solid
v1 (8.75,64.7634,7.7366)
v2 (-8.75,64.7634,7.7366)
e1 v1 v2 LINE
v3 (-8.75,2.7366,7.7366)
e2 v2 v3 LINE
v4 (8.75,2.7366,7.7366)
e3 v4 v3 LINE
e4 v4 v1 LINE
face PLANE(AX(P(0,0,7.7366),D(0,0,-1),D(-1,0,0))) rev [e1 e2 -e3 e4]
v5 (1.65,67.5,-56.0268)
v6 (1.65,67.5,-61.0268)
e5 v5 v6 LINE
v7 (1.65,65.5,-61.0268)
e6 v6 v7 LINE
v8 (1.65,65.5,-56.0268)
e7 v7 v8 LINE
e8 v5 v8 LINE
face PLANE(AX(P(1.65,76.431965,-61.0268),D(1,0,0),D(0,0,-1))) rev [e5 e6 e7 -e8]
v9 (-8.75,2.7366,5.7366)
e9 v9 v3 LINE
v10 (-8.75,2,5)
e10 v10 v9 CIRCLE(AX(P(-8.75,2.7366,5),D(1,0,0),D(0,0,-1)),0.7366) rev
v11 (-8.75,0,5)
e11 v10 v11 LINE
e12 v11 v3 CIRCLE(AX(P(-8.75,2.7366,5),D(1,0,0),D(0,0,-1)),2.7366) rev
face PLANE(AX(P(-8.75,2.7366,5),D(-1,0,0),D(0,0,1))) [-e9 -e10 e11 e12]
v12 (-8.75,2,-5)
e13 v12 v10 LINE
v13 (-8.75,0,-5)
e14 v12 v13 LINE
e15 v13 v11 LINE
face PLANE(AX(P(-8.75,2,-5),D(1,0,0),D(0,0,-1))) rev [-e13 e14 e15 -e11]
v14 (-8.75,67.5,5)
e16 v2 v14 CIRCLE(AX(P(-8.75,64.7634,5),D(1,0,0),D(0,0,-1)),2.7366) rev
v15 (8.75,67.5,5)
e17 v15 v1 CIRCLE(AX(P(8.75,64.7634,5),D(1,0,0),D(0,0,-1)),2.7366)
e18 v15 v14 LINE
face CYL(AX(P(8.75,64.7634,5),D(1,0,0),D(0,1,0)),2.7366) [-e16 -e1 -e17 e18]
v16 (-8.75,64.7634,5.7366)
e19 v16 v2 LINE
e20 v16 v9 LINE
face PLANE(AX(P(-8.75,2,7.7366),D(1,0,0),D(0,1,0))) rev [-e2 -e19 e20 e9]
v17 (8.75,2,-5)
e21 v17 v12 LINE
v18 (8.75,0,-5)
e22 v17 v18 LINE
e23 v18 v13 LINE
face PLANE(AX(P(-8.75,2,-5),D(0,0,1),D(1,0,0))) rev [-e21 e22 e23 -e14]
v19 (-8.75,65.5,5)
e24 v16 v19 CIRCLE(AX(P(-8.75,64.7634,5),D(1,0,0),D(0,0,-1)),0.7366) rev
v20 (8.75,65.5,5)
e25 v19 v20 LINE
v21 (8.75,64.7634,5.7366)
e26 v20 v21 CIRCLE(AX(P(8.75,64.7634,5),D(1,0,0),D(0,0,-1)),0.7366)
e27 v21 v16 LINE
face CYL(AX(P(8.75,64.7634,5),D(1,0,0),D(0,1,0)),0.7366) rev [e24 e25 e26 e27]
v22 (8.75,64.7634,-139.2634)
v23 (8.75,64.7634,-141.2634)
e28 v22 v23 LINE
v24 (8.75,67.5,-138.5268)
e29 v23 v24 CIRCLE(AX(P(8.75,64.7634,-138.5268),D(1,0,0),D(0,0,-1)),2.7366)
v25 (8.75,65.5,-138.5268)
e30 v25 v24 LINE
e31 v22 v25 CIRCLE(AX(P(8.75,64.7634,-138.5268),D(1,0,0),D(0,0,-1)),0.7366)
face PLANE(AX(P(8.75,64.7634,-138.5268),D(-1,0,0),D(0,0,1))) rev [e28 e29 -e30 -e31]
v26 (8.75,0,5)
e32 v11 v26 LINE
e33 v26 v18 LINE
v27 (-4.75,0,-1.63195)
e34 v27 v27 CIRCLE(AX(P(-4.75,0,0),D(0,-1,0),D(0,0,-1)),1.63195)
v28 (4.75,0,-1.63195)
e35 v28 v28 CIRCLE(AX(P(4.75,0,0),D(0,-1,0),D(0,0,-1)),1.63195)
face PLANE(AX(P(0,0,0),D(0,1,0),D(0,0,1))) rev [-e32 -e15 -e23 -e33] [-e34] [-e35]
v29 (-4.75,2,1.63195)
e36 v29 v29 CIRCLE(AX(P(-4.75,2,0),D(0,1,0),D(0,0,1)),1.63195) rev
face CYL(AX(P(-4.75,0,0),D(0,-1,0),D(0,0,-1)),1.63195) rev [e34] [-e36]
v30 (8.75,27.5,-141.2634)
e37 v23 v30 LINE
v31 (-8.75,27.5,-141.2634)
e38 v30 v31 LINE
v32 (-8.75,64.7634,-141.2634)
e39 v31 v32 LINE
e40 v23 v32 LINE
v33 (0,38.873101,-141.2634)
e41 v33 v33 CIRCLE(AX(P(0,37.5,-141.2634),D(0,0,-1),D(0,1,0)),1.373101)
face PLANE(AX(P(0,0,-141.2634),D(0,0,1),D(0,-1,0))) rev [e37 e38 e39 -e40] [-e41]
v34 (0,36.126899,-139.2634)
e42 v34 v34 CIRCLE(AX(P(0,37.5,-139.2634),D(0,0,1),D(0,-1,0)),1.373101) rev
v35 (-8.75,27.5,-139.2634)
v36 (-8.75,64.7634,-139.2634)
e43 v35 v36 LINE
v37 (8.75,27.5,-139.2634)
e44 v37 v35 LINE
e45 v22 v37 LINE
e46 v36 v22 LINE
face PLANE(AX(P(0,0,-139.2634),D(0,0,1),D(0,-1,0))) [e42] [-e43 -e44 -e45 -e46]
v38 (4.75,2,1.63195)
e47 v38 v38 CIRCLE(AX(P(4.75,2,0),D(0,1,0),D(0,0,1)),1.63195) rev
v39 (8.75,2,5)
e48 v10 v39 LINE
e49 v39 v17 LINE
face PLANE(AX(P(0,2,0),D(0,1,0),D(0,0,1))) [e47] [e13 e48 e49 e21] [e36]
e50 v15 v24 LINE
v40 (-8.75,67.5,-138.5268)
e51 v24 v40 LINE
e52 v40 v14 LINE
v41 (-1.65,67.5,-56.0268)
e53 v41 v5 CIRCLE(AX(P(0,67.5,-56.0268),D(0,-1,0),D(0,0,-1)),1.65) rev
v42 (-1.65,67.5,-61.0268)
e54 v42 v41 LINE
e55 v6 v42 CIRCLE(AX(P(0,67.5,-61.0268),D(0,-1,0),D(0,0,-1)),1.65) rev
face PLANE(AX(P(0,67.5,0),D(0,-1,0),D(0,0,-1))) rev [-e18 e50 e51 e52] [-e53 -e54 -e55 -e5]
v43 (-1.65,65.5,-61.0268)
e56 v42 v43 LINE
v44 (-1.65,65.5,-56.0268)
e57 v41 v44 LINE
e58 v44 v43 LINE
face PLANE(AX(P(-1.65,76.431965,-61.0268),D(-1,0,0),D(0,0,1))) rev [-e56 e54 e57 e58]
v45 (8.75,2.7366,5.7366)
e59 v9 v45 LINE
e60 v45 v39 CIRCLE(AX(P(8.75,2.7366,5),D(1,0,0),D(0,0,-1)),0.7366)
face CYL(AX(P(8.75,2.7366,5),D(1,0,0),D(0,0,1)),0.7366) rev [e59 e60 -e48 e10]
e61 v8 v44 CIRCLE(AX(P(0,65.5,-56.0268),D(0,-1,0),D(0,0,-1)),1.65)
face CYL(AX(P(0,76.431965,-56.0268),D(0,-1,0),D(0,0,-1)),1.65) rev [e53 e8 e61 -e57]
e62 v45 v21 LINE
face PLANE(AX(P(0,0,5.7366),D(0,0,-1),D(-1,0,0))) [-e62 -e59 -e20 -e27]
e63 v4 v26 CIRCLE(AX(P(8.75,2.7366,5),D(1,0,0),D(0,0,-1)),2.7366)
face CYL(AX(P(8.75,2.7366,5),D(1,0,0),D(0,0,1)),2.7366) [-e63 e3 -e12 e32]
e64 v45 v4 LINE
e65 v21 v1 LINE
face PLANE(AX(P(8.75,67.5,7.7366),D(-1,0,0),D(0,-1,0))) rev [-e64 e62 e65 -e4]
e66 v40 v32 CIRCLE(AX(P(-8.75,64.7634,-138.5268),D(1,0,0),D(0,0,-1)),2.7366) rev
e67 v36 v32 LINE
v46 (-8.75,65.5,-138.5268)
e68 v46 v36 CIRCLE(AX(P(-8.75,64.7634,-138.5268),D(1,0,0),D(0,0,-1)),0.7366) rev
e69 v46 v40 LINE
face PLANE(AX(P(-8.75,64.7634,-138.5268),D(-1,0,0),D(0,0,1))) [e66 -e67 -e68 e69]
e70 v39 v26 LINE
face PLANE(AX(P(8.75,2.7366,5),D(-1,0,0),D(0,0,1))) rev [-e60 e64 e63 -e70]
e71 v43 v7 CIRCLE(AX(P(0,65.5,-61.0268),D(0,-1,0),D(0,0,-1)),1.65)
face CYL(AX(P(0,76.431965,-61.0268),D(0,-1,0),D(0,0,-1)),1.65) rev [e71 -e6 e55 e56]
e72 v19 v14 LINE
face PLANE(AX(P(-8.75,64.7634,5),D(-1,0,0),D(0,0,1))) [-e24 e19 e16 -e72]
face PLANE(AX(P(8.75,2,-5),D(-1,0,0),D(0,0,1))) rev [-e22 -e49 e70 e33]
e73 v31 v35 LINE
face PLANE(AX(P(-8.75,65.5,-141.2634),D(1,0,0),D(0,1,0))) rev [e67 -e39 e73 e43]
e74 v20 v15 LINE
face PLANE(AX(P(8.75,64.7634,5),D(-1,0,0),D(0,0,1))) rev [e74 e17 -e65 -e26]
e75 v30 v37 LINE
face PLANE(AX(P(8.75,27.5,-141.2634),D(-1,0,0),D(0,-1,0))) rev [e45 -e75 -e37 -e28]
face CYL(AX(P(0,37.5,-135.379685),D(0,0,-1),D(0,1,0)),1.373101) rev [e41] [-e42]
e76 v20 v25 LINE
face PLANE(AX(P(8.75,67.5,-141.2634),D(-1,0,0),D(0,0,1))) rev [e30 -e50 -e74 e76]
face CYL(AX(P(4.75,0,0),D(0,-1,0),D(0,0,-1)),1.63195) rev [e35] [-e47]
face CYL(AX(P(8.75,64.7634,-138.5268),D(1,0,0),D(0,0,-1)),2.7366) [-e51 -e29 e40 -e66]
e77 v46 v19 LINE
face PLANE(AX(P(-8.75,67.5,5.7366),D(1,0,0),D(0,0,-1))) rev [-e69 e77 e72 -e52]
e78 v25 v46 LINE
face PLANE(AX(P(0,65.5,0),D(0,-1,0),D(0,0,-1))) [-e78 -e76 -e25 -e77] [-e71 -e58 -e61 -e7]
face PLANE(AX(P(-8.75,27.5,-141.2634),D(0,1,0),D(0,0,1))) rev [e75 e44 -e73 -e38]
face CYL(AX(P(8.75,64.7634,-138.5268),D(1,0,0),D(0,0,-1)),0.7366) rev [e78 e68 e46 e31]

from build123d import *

# Parameters (mm, degrees)
SKETCH1_W                    = 17.5
SKETCH1_H                    = 10
BASE_FLANGE1_DEPTH           = 2
EDGE_FLANGE1_DEPTH           = 17.5
EDGE_FLANGE2_STRIP_W         = 9.4732
EDGE_FLANGE2_STRIP_H         = 2
EDGE_FLANGE2_STRIP_CUT_DEPTH = 17.5
EDGE_FLANGE2_DEPTH           = 17.5
EDGE_FLANGE3_STRIP_W         = 9.4732
EDGE_FLANGE3_STRIP_H         = 2
EDGE_FLANGE3_STRIP_CUT_DEPTH = 17.5
EDGE_FLANGE3_DEPTH           = 17.5
F_4_CLEARANCE_HOLE1_D        = 3.2639
F_4_CLEARANCE_HOLE1_DEPTH    = 2
F_4_CLEARANCE_HOLE1_TIP      = 0.980574487
CUT_EXTRUDE3_DEPTH           = 2
SKETCH25_R                   = 1.373100621
CUT_EXTRUDE4_DEPTH           = 2


# Sheet-metal steps are written as plain solids
with BuildPart() as part:
    # Sketch1 → Base-Flange1 (new body)
    with BuildSketch(Plane(origin=(0, 0, 0), x_dir=(1, 0, 0), z_dir=(0, 1, 0))):
        Rectangle(SKETCH1_W, SKETCH1_H)
    extrude(amount=BASE_FLANGE1_DEPTH)

    # Edge-Flange1 section (across the edge) → Edge-Flange1 (add)
    with BuildSketch(Plane(origin=(-8.75, 2, 5.7366), x_dir=(0, 0, -1), z_dir=(1, 0, 0))):
        with BuildLine():
            Line((-2, 0.7366), (-2, 65.5))
            Line((-2, 65.5), (0, 65.5))
            Line((0, 65.5), (0, 0.7366))
            ThreePointArc((0, 0.7366), (0.215745145, 0.215745145), (0.7366, 0))
            Line((0.7366, 0), (0.7366, -2))
            ThreePointArc((0.7366, -2), (-1.198468417, -1.198468417), (-2, 0.7366))
        make_face()
    extrude(amount=EDGE_FLANGE1_DEPTH)

    # Edge-Flange2 strip (across the edge) → Edge-Flange2 strip cut (cut)
    with BuildSketch(Plane(origin=(-8.75, 67.5, 5.7366), x_dir=(0, -1, 0), z_dir=(1, 0, 0))):
        with Locations((-2, -1)):
            Rectangle(EDGE_FLANGE2_STRIP_W, EDGE_FLANGE2_STRIP_H)
    extrude(amount=EDGE_FLANGE2_STRIP_CUT_DEPTH, mode=Mode.SUBTRACT)

    # Edge-Flange2 section (across the edge) → Edge-Flange2 (add)
    with BuildSketch(Plane(origin=(-8.75, 67.5, 5.7366), x_dir=(0, -1, 0), z_dir=(1, 0, 0))):
        with BuildLine():
            Line((0, 0.7366), (0, 147))
            Line((0, 147), (2, 147))
            Line((2, 147), (2, 0.7366))
            ThreePointArc((2, 0.7366), (2.215745145, 0.215745145), (2.7366, 0))
            Line((2.7366, 0), (2.7366, -2))
            ThreePointArc((2.7366, -2), (0.801531583, -1.198468417), (0, 0.7366))
        make_face()
    extrude(amount=EDGE_FLANGE2_DEPTH)

    # Edge-Flange3 strip (across the edge) → Edge-Flange3 strip cut (cut)
    with BuildSketch(Plane(origin=(-8.75, 65.5, -141.2634), x_dir=(0, 0, 1), z_dir=(1, 0, 0))):
        with Locations((-2, -1)):
            Rectangle(EDGE_FLANGE3_STRIP_W, EDGE_FLANGE3_STRIP_H)
    extrude(amount=EDGE_FLANGE3_STRIP_CUT_DEPTH, mode=Mode.SUBTRACT)

    # Edge-Flange3 section (across the edge) → Edge-Flange3 (add)
    with BuildSketch(Plane(origin=(-8.75, 65.5, -141.2634), x_dir=(0, 0, 1), z_dir=(1, 0, 0))):
        with BuildLine():
            Line((0, 0.7366), (0, 38))
            Line((0, 38), (2, 38))
            Line((2, 38), (2, 0.7366))
            ThreePointArc((2, 0.7366), (2.215745145, 0.215745145), (2.7366, 0))
            Line((2.7366, 0), (2.7366, -2))
            ThreePointArc((2.7366, -2), (0.801531583, -1.198468417), (0, 0.7366))
        make_face()
    extrude(amount=EDGE_FLANGE3_DEPTH)

    # #4 Clearance Hole1
    with Locations(Plane.XZ):
        with Locations((4.75, 0), (-4.75, 0)):
            Hole(F_4_CLEARANCE_HOLE1_D / 2, depth=F_4_CLEARANCE_HOLE1_DEPTH)
            with Locations((0, 0, -(F_4_CLEARANCE_HOLE1_DEPTH + F_4_CLEARANCE_HOLE1_TIP / 2))):  # 118° drill point
                Cone(0, F_4_CLEARANCE_HOLE1_D / 2, F_4_CLEARANCE_HOLE1_TIP, mode=Mode.SUBTRACT)

    # Sketch23 → Cut-Extrude3 (cut)
    with BuildSketch(Plane.XZ.offset(-65.5)):
        with BuildLine():
            Line((-1.65, -61.0268), (-1.65, -56.0268))
            ThreePointArc((-1.65, -56.0268), (0, -54.3768), (1.65, -56.0268))
            Line((1.65, -56.0268), (1.65, -61.0268))
            ThreePointArc((1.65, -61.0268), (0, -62.6768), (-1.65, -61.0268))
        make_face()
    extrude(amount=-CUT_EXTRUDE3_DEPTH, mode=Mode.SUBTRACT)

    # Sketch25 → Cut-Extrude4 (cut)
    with BuildSketch(Plane(origin=(0, 0, -141.2634), x_dir=(-1, 0, 0), z_dir=(0, 0, -1))):
        with Locations(Location((0, 37.5, 0), (0, 0, 90))):
            Circle(SKETCH25_R)
    extrude(amount=-CUT_EXTRUDE4_DEPTH, mode=Mode.SUBTRACT)


solid = part.part
